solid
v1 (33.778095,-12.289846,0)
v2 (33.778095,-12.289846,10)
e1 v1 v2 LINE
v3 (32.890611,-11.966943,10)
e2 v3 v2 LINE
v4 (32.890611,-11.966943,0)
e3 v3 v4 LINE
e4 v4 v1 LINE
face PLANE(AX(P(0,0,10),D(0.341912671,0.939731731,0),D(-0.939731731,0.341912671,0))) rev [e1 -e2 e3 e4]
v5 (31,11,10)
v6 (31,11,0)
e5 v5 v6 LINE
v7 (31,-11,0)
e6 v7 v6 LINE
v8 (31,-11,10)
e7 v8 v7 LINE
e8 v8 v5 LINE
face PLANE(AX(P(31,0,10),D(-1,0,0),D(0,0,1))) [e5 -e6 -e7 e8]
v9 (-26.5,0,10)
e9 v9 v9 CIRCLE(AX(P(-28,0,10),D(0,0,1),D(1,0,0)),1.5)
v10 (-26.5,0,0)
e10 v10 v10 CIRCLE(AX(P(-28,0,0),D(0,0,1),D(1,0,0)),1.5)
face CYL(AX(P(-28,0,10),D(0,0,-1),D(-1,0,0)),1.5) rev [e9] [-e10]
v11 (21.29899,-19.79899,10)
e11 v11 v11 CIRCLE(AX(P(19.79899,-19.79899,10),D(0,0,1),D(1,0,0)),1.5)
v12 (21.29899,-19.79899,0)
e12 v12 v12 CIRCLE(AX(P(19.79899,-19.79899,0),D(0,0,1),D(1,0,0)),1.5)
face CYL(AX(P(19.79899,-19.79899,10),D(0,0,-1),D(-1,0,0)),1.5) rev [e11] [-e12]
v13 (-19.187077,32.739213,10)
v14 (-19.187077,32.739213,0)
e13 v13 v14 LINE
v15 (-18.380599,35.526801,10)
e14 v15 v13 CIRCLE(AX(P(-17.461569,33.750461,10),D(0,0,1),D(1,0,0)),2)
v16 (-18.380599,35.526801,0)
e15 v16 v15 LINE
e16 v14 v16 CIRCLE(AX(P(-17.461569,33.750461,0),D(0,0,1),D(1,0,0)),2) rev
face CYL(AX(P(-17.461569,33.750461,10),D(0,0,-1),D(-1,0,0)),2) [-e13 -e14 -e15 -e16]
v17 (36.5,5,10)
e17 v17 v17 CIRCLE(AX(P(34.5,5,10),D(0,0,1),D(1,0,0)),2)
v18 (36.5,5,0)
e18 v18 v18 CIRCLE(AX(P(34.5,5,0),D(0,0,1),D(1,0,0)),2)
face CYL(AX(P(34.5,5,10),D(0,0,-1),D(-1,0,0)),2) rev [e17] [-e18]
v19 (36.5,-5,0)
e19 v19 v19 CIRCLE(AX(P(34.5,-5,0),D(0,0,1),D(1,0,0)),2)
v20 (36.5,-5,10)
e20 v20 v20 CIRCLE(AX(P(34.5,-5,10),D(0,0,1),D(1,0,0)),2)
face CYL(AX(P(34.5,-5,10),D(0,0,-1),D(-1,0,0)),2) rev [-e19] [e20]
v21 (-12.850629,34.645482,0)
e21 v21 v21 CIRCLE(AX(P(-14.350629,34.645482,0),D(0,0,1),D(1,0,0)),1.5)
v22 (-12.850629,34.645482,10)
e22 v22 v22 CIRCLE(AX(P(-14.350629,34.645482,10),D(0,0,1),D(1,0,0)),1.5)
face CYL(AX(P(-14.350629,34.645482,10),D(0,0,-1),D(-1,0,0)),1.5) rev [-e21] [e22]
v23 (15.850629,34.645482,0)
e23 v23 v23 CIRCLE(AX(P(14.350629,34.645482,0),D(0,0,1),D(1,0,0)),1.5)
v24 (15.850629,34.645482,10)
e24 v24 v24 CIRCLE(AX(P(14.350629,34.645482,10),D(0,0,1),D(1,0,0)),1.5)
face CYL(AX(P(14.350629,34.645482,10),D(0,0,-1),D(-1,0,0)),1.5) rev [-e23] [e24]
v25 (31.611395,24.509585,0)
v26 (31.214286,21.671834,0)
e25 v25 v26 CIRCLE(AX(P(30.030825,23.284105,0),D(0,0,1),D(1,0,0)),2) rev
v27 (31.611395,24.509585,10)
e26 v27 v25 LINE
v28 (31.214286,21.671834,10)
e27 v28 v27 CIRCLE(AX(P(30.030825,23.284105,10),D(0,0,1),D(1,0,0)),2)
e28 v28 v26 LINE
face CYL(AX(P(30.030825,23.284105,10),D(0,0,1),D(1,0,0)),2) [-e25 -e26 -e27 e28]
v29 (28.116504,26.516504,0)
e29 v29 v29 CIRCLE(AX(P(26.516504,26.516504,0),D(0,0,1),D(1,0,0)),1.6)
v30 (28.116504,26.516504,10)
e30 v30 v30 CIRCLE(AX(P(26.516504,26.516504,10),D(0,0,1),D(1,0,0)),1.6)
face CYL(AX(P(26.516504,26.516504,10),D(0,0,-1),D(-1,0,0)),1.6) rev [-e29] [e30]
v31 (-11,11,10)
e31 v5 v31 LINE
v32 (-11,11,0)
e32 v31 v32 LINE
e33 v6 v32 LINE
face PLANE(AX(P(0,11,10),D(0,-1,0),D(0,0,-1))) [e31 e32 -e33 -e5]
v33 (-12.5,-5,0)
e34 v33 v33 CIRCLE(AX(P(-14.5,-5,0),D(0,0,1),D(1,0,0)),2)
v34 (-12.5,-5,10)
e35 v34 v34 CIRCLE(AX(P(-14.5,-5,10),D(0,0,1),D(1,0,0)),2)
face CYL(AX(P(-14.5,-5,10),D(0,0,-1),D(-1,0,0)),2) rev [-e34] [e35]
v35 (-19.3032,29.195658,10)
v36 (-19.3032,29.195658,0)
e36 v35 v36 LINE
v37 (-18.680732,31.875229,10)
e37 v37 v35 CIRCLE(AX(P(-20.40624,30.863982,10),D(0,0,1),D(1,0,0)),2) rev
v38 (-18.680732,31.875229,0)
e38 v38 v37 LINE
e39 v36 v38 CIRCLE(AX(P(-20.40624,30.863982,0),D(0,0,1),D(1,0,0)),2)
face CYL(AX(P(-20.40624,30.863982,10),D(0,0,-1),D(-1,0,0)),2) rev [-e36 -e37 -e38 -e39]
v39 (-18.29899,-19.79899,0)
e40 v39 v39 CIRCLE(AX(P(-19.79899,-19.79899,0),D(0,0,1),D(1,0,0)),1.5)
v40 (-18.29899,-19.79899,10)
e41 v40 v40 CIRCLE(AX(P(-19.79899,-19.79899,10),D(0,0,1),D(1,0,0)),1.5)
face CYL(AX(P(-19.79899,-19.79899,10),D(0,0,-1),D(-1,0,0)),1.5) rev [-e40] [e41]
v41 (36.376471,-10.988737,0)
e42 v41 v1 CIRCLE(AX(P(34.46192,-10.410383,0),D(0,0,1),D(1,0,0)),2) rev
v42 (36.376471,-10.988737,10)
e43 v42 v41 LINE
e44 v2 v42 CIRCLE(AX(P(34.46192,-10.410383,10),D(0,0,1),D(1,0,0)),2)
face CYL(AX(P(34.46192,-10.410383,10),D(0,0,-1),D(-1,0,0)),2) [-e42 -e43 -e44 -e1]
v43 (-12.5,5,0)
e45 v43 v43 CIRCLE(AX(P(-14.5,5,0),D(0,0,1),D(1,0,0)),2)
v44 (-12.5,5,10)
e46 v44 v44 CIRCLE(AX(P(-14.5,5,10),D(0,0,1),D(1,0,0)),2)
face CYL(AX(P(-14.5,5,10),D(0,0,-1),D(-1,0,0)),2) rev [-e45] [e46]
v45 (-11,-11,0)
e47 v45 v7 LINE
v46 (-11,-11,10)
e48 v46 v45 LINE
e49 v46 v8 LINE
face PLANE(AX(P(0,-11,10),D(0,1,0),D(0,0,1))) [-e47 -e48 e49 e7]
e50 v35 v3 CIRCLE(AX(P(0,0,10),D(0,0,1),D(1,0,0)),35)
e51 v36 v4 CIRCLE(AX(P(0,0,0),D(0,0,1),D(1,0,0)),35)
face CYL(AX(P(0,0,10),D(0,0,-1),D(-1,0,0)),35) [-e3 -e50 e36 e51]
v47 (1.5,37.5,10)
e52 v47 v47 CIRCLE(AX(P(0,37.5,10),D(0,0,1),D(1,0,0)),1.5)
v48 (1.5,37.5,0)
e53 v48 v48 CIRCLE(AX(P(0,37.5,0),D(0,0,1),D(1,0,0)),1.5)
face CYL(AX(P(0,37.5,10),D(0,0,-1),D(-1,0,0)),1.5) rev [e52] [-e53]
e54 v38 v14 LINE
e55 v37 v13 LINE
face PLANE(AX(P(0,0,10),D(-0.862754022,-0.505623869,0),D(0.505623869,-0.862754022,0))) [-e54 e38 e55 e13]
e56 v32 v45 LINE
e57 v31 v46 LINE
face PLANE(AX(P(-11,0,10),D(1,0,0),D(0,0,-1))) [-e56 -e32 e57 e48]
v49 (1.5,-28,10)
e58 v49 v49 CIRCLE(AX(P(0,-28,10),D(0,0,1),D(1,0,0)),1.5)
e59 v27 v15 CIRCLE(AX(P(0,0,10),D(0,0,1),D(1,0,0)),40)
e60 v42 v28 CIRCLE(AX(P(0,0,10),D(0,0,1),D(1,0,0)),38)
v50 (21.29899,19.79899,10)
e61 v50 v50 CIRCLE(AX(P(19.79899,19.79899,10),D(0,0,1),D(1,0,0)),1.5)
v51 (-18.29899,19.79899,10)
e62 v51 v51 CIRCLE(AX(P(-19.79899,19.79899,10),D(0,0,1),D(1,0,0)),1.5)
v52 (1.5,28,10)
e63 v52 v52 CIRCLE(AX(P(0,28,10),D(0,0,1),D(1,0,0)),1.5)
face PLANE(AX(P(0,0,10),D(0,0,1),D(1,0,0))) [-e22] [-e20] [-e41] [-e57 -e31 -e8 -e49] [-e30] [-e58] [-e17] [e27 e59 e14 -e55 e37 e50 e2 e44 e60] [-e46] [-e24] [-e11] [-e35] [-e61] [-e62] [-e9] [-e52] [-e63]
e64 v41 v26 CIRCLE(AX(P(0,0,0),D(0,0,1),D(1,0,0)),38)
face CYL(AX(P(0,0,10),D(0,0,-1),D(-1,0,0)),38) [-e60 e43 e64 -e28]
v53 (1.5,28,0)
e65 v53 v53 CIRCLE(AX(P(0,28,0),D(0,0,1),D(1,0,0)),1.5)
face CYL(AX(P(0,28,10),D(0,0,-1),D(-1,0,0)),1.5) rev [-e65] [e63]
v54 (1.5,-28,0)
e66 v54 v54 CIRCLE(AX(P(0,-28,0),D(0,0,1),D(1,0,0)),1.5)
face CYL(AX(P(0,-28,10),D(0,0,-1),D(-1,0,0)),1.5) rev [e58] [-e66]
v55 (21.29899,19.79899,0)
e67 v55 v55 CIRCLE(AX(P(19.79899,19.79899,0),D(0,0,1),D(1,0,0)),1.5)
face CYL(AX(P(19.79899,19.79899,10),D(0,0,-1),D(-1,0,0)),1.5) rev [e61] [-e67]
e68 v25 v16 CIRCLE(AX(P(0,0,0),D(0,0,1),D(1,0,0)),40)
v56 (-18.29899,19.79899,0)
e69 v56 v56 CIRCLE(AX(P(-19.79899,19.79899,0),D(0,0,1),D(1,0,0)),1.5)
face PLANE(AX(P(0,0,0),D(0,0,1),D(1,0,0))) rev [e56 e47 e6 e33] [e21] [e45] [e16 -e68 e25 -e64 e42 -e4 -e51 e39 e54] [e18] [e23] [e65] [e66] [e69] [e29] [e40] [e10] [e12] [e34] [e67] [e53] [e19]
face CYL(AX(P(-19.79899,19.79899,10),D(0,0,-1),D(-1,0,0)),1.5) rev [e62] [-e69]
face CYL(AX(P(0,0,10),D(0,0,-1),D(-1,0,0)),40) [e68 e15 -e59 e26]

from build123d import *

# Parameters (mm, degrees)
SKETCH_2_R      = 1.5
SKETCH_2_R_2    = 2
SKETCH_2_W      = 42
SKETCH_2_H      = 22
SKETCH_2_R_3    = 1.6
EXTRUDE_2_DEPTH = 10
FILLET_1_R      = 2


with BuildPart() as part:
    # 草图2 → 凸台-拉伸2 (new body)
    with BuildSketch(Plane.XY):
        with BuildLine():
            ThreePointArc((35.709805767, -12.992681481), (37.684421913, 4.88716125), (31.214285714, 21.671833502))
            Line((31.214285714, 21.671833502), (32.857142857, 22.812456318))
            ThreePointArc((32.857142857, 22.812456318), (8.608258655, 39.062742901), (-20.224954765, 34.510160892))
            Line((-20.224954765, 34.510160892), (-17.696835419, 30.19639078))
            ThreePointArc((-17.696835419, 30.19639078), (-22.408690047, -26.885881246), (32.890610575, -11.96694347))
            Line((32.890610575, -11.96694347), (35.709805767, -12.992681481))
        make_face()
        with Locations((-19.798989873, -19.798989873)):
            Circle(SKETCH_2_R, mode=Mode.SUBTRACT)
        with Locations((0, -28)):
            Circle(SKETCH_2_R, mode=Mode.SUBTRACT)
        with Locations((-14.5, -5)):
            Circle(SKETCH_2_R_2, mode=Mode.SUBTRACT)
        with Locations((-28, 0)):
            Circle(SKETCH_2_R, mode=Mode.SUBTRACT)
        with Locations((19.798989873, -19.798989873)):
            Circle(SKETCH_2_R, mode=Mode.SUBTRACT)
        with Locations((10, 0)):
            Rectangle(SKETCH_2_W, SKETCH_2_H, mode=Mode.SUBTRACT)
        with Locations((34.5, -5)):
            Circle(SKETCH_2_R_2, mode=Mode.SUBTRACT)
        with Locations((-14.5, 5)):
            Circle(SKETCH_2_R_2, mode=Mode.SUBTRACT)
        with Locations((-19.798989873, 19.798989873)):
            Circle(SKETCH_2_R, mode=Mode.SUBTRACT)
        with Locations((0, 28)):
            Circle(SKETCH_2_R, mode=Mode.SUBTRACT)
        with Locations((19.798989873, 19.798989873)):
            Circle(SKETCH_2_R, mode=Mode.SUBTRACT)
        with Locations((34.5, 5)):
            Circle(SKETCH_2_R_2, mode=Mode.SUBTRACT)
        with Locations((26.516504294, 26.516504294)):
            Circle(SKETCH_2_R_3, mode=Mode.SUBTRACT)
        with Locations((14.350628714, 34.645482469)):
            Circle(SKETCH_2_R, mode=Mode.SUBTRACT)
        with Locations((0, 37.5)):
            Circle(SKETCH_2_R, mode=Mode.SUBTRACT)
        with Locations((-14.350628714, 34.645482469)):
            Circle(SKETCH_2_R, mode=Mode.SUBTRACT)
    extrude(amount=EXTRUDE_2_DEPTH)

    # 圆角1
    # the kernel refuses this fillet: 2 mm, written as the material it adds along each edge
    with BuildSketch(Plane(origin=(-17.696835419, 30.19639078, 0), x_dir=(-0.5056238691162223, 0.862754022291372, 0), z_dir=(0, 0, 1))) as fillet_1_piece_1:
        with BuildLine():
            CenterArc((1.945906404, 2), FILLET_1_R, 183.09857934, 86.90142066)
            ThreePointArc((-0.051169618, 1.891891892), (-0.012794743, 0.946291876), (0, 0))
            Line((0, 0), (1.945906404, 0))
        make_face()
    extrude(amount=10)
    # the kernel refuses this fillet: 2 mm, written as the material it takes off along each edge
    with BuildSketch(Plane(origin=(35.709805767, -12.992681481, -5.279816712), x_dir=(0.3156668887072375, 0.9488700729677867, 0), z_dir=(0, 0, 1))) as fillet_1_2_piece_1:
        with BuildLine():
            CenterArc((2.056349667, 1.99922765), FILLET_1_R, 178.407630732, 93.184738537)
            Line((0.057122017, 2.054804668), (0, 0))
            ThreePointArc((0, 0), (1.055963342, -0.014674657), (2.111926685, 0))
        make_face()
    extrude(amount=20.559633424, mode=Mode.SUBTRACT)
    with BuildSketch(Plane(origin=(32.857142857, 22.812456318, -5.26498253), x_dir=(-0.8214285714285717, -0.5703114079525466, 0), z_dir=(0, 0, 1))) as fillet_1_2_piece_2_section:
        with BuildLine():
            CenterArc((2.052668078, -2), FILLET_1_R, 90, 93.01696131)
            ThreePointArc((0.055440082, -2.105263158), (0.013862423, -1.052996506), (0, 0))
            Line((0, 0), (2.052668078, 0))
        make_face()
    fillet_1_2_piece_2 = extrude(amount=20.52996506, mode=Mode.PRIVATE)
    fillet_1_2_piece_2 = fillet_1_2_piece_2 - Plane(origin=(0, 0, 5), x_dir=(0.9397317307134324, -0.3419126705612664, 0), z_dir=(0, 0, -1)) * Cylinder(38, 50, mode=Mode.PRIVATE)
    add(fillet_1_2_piece_2, mode=Mode.SUBTRACT)
    with BuildSketch(Plane(origin=(-20.224954765, 34.510160892, -5.26498253), x_dir=(0.8757655299583756, 0.48273671554660663, 0), z_dir=(0, 0, 1))) as fillet_1_2_piece_3:
        with BuildLine():
            CenterArc((2.053343187, -1.999306879), FILLET_1_R, 88.491519345, 93.01696131)
            Line((0.054036308, -2.051956704), (0, 0))
            ThreePointArc((0, 0), (1.052996506, 0.013862423), (2.105993012, 0))
        make_face()
    extrude(amount=20.52996506, mode=Mode.SUBTRACT)


solid = part.part
